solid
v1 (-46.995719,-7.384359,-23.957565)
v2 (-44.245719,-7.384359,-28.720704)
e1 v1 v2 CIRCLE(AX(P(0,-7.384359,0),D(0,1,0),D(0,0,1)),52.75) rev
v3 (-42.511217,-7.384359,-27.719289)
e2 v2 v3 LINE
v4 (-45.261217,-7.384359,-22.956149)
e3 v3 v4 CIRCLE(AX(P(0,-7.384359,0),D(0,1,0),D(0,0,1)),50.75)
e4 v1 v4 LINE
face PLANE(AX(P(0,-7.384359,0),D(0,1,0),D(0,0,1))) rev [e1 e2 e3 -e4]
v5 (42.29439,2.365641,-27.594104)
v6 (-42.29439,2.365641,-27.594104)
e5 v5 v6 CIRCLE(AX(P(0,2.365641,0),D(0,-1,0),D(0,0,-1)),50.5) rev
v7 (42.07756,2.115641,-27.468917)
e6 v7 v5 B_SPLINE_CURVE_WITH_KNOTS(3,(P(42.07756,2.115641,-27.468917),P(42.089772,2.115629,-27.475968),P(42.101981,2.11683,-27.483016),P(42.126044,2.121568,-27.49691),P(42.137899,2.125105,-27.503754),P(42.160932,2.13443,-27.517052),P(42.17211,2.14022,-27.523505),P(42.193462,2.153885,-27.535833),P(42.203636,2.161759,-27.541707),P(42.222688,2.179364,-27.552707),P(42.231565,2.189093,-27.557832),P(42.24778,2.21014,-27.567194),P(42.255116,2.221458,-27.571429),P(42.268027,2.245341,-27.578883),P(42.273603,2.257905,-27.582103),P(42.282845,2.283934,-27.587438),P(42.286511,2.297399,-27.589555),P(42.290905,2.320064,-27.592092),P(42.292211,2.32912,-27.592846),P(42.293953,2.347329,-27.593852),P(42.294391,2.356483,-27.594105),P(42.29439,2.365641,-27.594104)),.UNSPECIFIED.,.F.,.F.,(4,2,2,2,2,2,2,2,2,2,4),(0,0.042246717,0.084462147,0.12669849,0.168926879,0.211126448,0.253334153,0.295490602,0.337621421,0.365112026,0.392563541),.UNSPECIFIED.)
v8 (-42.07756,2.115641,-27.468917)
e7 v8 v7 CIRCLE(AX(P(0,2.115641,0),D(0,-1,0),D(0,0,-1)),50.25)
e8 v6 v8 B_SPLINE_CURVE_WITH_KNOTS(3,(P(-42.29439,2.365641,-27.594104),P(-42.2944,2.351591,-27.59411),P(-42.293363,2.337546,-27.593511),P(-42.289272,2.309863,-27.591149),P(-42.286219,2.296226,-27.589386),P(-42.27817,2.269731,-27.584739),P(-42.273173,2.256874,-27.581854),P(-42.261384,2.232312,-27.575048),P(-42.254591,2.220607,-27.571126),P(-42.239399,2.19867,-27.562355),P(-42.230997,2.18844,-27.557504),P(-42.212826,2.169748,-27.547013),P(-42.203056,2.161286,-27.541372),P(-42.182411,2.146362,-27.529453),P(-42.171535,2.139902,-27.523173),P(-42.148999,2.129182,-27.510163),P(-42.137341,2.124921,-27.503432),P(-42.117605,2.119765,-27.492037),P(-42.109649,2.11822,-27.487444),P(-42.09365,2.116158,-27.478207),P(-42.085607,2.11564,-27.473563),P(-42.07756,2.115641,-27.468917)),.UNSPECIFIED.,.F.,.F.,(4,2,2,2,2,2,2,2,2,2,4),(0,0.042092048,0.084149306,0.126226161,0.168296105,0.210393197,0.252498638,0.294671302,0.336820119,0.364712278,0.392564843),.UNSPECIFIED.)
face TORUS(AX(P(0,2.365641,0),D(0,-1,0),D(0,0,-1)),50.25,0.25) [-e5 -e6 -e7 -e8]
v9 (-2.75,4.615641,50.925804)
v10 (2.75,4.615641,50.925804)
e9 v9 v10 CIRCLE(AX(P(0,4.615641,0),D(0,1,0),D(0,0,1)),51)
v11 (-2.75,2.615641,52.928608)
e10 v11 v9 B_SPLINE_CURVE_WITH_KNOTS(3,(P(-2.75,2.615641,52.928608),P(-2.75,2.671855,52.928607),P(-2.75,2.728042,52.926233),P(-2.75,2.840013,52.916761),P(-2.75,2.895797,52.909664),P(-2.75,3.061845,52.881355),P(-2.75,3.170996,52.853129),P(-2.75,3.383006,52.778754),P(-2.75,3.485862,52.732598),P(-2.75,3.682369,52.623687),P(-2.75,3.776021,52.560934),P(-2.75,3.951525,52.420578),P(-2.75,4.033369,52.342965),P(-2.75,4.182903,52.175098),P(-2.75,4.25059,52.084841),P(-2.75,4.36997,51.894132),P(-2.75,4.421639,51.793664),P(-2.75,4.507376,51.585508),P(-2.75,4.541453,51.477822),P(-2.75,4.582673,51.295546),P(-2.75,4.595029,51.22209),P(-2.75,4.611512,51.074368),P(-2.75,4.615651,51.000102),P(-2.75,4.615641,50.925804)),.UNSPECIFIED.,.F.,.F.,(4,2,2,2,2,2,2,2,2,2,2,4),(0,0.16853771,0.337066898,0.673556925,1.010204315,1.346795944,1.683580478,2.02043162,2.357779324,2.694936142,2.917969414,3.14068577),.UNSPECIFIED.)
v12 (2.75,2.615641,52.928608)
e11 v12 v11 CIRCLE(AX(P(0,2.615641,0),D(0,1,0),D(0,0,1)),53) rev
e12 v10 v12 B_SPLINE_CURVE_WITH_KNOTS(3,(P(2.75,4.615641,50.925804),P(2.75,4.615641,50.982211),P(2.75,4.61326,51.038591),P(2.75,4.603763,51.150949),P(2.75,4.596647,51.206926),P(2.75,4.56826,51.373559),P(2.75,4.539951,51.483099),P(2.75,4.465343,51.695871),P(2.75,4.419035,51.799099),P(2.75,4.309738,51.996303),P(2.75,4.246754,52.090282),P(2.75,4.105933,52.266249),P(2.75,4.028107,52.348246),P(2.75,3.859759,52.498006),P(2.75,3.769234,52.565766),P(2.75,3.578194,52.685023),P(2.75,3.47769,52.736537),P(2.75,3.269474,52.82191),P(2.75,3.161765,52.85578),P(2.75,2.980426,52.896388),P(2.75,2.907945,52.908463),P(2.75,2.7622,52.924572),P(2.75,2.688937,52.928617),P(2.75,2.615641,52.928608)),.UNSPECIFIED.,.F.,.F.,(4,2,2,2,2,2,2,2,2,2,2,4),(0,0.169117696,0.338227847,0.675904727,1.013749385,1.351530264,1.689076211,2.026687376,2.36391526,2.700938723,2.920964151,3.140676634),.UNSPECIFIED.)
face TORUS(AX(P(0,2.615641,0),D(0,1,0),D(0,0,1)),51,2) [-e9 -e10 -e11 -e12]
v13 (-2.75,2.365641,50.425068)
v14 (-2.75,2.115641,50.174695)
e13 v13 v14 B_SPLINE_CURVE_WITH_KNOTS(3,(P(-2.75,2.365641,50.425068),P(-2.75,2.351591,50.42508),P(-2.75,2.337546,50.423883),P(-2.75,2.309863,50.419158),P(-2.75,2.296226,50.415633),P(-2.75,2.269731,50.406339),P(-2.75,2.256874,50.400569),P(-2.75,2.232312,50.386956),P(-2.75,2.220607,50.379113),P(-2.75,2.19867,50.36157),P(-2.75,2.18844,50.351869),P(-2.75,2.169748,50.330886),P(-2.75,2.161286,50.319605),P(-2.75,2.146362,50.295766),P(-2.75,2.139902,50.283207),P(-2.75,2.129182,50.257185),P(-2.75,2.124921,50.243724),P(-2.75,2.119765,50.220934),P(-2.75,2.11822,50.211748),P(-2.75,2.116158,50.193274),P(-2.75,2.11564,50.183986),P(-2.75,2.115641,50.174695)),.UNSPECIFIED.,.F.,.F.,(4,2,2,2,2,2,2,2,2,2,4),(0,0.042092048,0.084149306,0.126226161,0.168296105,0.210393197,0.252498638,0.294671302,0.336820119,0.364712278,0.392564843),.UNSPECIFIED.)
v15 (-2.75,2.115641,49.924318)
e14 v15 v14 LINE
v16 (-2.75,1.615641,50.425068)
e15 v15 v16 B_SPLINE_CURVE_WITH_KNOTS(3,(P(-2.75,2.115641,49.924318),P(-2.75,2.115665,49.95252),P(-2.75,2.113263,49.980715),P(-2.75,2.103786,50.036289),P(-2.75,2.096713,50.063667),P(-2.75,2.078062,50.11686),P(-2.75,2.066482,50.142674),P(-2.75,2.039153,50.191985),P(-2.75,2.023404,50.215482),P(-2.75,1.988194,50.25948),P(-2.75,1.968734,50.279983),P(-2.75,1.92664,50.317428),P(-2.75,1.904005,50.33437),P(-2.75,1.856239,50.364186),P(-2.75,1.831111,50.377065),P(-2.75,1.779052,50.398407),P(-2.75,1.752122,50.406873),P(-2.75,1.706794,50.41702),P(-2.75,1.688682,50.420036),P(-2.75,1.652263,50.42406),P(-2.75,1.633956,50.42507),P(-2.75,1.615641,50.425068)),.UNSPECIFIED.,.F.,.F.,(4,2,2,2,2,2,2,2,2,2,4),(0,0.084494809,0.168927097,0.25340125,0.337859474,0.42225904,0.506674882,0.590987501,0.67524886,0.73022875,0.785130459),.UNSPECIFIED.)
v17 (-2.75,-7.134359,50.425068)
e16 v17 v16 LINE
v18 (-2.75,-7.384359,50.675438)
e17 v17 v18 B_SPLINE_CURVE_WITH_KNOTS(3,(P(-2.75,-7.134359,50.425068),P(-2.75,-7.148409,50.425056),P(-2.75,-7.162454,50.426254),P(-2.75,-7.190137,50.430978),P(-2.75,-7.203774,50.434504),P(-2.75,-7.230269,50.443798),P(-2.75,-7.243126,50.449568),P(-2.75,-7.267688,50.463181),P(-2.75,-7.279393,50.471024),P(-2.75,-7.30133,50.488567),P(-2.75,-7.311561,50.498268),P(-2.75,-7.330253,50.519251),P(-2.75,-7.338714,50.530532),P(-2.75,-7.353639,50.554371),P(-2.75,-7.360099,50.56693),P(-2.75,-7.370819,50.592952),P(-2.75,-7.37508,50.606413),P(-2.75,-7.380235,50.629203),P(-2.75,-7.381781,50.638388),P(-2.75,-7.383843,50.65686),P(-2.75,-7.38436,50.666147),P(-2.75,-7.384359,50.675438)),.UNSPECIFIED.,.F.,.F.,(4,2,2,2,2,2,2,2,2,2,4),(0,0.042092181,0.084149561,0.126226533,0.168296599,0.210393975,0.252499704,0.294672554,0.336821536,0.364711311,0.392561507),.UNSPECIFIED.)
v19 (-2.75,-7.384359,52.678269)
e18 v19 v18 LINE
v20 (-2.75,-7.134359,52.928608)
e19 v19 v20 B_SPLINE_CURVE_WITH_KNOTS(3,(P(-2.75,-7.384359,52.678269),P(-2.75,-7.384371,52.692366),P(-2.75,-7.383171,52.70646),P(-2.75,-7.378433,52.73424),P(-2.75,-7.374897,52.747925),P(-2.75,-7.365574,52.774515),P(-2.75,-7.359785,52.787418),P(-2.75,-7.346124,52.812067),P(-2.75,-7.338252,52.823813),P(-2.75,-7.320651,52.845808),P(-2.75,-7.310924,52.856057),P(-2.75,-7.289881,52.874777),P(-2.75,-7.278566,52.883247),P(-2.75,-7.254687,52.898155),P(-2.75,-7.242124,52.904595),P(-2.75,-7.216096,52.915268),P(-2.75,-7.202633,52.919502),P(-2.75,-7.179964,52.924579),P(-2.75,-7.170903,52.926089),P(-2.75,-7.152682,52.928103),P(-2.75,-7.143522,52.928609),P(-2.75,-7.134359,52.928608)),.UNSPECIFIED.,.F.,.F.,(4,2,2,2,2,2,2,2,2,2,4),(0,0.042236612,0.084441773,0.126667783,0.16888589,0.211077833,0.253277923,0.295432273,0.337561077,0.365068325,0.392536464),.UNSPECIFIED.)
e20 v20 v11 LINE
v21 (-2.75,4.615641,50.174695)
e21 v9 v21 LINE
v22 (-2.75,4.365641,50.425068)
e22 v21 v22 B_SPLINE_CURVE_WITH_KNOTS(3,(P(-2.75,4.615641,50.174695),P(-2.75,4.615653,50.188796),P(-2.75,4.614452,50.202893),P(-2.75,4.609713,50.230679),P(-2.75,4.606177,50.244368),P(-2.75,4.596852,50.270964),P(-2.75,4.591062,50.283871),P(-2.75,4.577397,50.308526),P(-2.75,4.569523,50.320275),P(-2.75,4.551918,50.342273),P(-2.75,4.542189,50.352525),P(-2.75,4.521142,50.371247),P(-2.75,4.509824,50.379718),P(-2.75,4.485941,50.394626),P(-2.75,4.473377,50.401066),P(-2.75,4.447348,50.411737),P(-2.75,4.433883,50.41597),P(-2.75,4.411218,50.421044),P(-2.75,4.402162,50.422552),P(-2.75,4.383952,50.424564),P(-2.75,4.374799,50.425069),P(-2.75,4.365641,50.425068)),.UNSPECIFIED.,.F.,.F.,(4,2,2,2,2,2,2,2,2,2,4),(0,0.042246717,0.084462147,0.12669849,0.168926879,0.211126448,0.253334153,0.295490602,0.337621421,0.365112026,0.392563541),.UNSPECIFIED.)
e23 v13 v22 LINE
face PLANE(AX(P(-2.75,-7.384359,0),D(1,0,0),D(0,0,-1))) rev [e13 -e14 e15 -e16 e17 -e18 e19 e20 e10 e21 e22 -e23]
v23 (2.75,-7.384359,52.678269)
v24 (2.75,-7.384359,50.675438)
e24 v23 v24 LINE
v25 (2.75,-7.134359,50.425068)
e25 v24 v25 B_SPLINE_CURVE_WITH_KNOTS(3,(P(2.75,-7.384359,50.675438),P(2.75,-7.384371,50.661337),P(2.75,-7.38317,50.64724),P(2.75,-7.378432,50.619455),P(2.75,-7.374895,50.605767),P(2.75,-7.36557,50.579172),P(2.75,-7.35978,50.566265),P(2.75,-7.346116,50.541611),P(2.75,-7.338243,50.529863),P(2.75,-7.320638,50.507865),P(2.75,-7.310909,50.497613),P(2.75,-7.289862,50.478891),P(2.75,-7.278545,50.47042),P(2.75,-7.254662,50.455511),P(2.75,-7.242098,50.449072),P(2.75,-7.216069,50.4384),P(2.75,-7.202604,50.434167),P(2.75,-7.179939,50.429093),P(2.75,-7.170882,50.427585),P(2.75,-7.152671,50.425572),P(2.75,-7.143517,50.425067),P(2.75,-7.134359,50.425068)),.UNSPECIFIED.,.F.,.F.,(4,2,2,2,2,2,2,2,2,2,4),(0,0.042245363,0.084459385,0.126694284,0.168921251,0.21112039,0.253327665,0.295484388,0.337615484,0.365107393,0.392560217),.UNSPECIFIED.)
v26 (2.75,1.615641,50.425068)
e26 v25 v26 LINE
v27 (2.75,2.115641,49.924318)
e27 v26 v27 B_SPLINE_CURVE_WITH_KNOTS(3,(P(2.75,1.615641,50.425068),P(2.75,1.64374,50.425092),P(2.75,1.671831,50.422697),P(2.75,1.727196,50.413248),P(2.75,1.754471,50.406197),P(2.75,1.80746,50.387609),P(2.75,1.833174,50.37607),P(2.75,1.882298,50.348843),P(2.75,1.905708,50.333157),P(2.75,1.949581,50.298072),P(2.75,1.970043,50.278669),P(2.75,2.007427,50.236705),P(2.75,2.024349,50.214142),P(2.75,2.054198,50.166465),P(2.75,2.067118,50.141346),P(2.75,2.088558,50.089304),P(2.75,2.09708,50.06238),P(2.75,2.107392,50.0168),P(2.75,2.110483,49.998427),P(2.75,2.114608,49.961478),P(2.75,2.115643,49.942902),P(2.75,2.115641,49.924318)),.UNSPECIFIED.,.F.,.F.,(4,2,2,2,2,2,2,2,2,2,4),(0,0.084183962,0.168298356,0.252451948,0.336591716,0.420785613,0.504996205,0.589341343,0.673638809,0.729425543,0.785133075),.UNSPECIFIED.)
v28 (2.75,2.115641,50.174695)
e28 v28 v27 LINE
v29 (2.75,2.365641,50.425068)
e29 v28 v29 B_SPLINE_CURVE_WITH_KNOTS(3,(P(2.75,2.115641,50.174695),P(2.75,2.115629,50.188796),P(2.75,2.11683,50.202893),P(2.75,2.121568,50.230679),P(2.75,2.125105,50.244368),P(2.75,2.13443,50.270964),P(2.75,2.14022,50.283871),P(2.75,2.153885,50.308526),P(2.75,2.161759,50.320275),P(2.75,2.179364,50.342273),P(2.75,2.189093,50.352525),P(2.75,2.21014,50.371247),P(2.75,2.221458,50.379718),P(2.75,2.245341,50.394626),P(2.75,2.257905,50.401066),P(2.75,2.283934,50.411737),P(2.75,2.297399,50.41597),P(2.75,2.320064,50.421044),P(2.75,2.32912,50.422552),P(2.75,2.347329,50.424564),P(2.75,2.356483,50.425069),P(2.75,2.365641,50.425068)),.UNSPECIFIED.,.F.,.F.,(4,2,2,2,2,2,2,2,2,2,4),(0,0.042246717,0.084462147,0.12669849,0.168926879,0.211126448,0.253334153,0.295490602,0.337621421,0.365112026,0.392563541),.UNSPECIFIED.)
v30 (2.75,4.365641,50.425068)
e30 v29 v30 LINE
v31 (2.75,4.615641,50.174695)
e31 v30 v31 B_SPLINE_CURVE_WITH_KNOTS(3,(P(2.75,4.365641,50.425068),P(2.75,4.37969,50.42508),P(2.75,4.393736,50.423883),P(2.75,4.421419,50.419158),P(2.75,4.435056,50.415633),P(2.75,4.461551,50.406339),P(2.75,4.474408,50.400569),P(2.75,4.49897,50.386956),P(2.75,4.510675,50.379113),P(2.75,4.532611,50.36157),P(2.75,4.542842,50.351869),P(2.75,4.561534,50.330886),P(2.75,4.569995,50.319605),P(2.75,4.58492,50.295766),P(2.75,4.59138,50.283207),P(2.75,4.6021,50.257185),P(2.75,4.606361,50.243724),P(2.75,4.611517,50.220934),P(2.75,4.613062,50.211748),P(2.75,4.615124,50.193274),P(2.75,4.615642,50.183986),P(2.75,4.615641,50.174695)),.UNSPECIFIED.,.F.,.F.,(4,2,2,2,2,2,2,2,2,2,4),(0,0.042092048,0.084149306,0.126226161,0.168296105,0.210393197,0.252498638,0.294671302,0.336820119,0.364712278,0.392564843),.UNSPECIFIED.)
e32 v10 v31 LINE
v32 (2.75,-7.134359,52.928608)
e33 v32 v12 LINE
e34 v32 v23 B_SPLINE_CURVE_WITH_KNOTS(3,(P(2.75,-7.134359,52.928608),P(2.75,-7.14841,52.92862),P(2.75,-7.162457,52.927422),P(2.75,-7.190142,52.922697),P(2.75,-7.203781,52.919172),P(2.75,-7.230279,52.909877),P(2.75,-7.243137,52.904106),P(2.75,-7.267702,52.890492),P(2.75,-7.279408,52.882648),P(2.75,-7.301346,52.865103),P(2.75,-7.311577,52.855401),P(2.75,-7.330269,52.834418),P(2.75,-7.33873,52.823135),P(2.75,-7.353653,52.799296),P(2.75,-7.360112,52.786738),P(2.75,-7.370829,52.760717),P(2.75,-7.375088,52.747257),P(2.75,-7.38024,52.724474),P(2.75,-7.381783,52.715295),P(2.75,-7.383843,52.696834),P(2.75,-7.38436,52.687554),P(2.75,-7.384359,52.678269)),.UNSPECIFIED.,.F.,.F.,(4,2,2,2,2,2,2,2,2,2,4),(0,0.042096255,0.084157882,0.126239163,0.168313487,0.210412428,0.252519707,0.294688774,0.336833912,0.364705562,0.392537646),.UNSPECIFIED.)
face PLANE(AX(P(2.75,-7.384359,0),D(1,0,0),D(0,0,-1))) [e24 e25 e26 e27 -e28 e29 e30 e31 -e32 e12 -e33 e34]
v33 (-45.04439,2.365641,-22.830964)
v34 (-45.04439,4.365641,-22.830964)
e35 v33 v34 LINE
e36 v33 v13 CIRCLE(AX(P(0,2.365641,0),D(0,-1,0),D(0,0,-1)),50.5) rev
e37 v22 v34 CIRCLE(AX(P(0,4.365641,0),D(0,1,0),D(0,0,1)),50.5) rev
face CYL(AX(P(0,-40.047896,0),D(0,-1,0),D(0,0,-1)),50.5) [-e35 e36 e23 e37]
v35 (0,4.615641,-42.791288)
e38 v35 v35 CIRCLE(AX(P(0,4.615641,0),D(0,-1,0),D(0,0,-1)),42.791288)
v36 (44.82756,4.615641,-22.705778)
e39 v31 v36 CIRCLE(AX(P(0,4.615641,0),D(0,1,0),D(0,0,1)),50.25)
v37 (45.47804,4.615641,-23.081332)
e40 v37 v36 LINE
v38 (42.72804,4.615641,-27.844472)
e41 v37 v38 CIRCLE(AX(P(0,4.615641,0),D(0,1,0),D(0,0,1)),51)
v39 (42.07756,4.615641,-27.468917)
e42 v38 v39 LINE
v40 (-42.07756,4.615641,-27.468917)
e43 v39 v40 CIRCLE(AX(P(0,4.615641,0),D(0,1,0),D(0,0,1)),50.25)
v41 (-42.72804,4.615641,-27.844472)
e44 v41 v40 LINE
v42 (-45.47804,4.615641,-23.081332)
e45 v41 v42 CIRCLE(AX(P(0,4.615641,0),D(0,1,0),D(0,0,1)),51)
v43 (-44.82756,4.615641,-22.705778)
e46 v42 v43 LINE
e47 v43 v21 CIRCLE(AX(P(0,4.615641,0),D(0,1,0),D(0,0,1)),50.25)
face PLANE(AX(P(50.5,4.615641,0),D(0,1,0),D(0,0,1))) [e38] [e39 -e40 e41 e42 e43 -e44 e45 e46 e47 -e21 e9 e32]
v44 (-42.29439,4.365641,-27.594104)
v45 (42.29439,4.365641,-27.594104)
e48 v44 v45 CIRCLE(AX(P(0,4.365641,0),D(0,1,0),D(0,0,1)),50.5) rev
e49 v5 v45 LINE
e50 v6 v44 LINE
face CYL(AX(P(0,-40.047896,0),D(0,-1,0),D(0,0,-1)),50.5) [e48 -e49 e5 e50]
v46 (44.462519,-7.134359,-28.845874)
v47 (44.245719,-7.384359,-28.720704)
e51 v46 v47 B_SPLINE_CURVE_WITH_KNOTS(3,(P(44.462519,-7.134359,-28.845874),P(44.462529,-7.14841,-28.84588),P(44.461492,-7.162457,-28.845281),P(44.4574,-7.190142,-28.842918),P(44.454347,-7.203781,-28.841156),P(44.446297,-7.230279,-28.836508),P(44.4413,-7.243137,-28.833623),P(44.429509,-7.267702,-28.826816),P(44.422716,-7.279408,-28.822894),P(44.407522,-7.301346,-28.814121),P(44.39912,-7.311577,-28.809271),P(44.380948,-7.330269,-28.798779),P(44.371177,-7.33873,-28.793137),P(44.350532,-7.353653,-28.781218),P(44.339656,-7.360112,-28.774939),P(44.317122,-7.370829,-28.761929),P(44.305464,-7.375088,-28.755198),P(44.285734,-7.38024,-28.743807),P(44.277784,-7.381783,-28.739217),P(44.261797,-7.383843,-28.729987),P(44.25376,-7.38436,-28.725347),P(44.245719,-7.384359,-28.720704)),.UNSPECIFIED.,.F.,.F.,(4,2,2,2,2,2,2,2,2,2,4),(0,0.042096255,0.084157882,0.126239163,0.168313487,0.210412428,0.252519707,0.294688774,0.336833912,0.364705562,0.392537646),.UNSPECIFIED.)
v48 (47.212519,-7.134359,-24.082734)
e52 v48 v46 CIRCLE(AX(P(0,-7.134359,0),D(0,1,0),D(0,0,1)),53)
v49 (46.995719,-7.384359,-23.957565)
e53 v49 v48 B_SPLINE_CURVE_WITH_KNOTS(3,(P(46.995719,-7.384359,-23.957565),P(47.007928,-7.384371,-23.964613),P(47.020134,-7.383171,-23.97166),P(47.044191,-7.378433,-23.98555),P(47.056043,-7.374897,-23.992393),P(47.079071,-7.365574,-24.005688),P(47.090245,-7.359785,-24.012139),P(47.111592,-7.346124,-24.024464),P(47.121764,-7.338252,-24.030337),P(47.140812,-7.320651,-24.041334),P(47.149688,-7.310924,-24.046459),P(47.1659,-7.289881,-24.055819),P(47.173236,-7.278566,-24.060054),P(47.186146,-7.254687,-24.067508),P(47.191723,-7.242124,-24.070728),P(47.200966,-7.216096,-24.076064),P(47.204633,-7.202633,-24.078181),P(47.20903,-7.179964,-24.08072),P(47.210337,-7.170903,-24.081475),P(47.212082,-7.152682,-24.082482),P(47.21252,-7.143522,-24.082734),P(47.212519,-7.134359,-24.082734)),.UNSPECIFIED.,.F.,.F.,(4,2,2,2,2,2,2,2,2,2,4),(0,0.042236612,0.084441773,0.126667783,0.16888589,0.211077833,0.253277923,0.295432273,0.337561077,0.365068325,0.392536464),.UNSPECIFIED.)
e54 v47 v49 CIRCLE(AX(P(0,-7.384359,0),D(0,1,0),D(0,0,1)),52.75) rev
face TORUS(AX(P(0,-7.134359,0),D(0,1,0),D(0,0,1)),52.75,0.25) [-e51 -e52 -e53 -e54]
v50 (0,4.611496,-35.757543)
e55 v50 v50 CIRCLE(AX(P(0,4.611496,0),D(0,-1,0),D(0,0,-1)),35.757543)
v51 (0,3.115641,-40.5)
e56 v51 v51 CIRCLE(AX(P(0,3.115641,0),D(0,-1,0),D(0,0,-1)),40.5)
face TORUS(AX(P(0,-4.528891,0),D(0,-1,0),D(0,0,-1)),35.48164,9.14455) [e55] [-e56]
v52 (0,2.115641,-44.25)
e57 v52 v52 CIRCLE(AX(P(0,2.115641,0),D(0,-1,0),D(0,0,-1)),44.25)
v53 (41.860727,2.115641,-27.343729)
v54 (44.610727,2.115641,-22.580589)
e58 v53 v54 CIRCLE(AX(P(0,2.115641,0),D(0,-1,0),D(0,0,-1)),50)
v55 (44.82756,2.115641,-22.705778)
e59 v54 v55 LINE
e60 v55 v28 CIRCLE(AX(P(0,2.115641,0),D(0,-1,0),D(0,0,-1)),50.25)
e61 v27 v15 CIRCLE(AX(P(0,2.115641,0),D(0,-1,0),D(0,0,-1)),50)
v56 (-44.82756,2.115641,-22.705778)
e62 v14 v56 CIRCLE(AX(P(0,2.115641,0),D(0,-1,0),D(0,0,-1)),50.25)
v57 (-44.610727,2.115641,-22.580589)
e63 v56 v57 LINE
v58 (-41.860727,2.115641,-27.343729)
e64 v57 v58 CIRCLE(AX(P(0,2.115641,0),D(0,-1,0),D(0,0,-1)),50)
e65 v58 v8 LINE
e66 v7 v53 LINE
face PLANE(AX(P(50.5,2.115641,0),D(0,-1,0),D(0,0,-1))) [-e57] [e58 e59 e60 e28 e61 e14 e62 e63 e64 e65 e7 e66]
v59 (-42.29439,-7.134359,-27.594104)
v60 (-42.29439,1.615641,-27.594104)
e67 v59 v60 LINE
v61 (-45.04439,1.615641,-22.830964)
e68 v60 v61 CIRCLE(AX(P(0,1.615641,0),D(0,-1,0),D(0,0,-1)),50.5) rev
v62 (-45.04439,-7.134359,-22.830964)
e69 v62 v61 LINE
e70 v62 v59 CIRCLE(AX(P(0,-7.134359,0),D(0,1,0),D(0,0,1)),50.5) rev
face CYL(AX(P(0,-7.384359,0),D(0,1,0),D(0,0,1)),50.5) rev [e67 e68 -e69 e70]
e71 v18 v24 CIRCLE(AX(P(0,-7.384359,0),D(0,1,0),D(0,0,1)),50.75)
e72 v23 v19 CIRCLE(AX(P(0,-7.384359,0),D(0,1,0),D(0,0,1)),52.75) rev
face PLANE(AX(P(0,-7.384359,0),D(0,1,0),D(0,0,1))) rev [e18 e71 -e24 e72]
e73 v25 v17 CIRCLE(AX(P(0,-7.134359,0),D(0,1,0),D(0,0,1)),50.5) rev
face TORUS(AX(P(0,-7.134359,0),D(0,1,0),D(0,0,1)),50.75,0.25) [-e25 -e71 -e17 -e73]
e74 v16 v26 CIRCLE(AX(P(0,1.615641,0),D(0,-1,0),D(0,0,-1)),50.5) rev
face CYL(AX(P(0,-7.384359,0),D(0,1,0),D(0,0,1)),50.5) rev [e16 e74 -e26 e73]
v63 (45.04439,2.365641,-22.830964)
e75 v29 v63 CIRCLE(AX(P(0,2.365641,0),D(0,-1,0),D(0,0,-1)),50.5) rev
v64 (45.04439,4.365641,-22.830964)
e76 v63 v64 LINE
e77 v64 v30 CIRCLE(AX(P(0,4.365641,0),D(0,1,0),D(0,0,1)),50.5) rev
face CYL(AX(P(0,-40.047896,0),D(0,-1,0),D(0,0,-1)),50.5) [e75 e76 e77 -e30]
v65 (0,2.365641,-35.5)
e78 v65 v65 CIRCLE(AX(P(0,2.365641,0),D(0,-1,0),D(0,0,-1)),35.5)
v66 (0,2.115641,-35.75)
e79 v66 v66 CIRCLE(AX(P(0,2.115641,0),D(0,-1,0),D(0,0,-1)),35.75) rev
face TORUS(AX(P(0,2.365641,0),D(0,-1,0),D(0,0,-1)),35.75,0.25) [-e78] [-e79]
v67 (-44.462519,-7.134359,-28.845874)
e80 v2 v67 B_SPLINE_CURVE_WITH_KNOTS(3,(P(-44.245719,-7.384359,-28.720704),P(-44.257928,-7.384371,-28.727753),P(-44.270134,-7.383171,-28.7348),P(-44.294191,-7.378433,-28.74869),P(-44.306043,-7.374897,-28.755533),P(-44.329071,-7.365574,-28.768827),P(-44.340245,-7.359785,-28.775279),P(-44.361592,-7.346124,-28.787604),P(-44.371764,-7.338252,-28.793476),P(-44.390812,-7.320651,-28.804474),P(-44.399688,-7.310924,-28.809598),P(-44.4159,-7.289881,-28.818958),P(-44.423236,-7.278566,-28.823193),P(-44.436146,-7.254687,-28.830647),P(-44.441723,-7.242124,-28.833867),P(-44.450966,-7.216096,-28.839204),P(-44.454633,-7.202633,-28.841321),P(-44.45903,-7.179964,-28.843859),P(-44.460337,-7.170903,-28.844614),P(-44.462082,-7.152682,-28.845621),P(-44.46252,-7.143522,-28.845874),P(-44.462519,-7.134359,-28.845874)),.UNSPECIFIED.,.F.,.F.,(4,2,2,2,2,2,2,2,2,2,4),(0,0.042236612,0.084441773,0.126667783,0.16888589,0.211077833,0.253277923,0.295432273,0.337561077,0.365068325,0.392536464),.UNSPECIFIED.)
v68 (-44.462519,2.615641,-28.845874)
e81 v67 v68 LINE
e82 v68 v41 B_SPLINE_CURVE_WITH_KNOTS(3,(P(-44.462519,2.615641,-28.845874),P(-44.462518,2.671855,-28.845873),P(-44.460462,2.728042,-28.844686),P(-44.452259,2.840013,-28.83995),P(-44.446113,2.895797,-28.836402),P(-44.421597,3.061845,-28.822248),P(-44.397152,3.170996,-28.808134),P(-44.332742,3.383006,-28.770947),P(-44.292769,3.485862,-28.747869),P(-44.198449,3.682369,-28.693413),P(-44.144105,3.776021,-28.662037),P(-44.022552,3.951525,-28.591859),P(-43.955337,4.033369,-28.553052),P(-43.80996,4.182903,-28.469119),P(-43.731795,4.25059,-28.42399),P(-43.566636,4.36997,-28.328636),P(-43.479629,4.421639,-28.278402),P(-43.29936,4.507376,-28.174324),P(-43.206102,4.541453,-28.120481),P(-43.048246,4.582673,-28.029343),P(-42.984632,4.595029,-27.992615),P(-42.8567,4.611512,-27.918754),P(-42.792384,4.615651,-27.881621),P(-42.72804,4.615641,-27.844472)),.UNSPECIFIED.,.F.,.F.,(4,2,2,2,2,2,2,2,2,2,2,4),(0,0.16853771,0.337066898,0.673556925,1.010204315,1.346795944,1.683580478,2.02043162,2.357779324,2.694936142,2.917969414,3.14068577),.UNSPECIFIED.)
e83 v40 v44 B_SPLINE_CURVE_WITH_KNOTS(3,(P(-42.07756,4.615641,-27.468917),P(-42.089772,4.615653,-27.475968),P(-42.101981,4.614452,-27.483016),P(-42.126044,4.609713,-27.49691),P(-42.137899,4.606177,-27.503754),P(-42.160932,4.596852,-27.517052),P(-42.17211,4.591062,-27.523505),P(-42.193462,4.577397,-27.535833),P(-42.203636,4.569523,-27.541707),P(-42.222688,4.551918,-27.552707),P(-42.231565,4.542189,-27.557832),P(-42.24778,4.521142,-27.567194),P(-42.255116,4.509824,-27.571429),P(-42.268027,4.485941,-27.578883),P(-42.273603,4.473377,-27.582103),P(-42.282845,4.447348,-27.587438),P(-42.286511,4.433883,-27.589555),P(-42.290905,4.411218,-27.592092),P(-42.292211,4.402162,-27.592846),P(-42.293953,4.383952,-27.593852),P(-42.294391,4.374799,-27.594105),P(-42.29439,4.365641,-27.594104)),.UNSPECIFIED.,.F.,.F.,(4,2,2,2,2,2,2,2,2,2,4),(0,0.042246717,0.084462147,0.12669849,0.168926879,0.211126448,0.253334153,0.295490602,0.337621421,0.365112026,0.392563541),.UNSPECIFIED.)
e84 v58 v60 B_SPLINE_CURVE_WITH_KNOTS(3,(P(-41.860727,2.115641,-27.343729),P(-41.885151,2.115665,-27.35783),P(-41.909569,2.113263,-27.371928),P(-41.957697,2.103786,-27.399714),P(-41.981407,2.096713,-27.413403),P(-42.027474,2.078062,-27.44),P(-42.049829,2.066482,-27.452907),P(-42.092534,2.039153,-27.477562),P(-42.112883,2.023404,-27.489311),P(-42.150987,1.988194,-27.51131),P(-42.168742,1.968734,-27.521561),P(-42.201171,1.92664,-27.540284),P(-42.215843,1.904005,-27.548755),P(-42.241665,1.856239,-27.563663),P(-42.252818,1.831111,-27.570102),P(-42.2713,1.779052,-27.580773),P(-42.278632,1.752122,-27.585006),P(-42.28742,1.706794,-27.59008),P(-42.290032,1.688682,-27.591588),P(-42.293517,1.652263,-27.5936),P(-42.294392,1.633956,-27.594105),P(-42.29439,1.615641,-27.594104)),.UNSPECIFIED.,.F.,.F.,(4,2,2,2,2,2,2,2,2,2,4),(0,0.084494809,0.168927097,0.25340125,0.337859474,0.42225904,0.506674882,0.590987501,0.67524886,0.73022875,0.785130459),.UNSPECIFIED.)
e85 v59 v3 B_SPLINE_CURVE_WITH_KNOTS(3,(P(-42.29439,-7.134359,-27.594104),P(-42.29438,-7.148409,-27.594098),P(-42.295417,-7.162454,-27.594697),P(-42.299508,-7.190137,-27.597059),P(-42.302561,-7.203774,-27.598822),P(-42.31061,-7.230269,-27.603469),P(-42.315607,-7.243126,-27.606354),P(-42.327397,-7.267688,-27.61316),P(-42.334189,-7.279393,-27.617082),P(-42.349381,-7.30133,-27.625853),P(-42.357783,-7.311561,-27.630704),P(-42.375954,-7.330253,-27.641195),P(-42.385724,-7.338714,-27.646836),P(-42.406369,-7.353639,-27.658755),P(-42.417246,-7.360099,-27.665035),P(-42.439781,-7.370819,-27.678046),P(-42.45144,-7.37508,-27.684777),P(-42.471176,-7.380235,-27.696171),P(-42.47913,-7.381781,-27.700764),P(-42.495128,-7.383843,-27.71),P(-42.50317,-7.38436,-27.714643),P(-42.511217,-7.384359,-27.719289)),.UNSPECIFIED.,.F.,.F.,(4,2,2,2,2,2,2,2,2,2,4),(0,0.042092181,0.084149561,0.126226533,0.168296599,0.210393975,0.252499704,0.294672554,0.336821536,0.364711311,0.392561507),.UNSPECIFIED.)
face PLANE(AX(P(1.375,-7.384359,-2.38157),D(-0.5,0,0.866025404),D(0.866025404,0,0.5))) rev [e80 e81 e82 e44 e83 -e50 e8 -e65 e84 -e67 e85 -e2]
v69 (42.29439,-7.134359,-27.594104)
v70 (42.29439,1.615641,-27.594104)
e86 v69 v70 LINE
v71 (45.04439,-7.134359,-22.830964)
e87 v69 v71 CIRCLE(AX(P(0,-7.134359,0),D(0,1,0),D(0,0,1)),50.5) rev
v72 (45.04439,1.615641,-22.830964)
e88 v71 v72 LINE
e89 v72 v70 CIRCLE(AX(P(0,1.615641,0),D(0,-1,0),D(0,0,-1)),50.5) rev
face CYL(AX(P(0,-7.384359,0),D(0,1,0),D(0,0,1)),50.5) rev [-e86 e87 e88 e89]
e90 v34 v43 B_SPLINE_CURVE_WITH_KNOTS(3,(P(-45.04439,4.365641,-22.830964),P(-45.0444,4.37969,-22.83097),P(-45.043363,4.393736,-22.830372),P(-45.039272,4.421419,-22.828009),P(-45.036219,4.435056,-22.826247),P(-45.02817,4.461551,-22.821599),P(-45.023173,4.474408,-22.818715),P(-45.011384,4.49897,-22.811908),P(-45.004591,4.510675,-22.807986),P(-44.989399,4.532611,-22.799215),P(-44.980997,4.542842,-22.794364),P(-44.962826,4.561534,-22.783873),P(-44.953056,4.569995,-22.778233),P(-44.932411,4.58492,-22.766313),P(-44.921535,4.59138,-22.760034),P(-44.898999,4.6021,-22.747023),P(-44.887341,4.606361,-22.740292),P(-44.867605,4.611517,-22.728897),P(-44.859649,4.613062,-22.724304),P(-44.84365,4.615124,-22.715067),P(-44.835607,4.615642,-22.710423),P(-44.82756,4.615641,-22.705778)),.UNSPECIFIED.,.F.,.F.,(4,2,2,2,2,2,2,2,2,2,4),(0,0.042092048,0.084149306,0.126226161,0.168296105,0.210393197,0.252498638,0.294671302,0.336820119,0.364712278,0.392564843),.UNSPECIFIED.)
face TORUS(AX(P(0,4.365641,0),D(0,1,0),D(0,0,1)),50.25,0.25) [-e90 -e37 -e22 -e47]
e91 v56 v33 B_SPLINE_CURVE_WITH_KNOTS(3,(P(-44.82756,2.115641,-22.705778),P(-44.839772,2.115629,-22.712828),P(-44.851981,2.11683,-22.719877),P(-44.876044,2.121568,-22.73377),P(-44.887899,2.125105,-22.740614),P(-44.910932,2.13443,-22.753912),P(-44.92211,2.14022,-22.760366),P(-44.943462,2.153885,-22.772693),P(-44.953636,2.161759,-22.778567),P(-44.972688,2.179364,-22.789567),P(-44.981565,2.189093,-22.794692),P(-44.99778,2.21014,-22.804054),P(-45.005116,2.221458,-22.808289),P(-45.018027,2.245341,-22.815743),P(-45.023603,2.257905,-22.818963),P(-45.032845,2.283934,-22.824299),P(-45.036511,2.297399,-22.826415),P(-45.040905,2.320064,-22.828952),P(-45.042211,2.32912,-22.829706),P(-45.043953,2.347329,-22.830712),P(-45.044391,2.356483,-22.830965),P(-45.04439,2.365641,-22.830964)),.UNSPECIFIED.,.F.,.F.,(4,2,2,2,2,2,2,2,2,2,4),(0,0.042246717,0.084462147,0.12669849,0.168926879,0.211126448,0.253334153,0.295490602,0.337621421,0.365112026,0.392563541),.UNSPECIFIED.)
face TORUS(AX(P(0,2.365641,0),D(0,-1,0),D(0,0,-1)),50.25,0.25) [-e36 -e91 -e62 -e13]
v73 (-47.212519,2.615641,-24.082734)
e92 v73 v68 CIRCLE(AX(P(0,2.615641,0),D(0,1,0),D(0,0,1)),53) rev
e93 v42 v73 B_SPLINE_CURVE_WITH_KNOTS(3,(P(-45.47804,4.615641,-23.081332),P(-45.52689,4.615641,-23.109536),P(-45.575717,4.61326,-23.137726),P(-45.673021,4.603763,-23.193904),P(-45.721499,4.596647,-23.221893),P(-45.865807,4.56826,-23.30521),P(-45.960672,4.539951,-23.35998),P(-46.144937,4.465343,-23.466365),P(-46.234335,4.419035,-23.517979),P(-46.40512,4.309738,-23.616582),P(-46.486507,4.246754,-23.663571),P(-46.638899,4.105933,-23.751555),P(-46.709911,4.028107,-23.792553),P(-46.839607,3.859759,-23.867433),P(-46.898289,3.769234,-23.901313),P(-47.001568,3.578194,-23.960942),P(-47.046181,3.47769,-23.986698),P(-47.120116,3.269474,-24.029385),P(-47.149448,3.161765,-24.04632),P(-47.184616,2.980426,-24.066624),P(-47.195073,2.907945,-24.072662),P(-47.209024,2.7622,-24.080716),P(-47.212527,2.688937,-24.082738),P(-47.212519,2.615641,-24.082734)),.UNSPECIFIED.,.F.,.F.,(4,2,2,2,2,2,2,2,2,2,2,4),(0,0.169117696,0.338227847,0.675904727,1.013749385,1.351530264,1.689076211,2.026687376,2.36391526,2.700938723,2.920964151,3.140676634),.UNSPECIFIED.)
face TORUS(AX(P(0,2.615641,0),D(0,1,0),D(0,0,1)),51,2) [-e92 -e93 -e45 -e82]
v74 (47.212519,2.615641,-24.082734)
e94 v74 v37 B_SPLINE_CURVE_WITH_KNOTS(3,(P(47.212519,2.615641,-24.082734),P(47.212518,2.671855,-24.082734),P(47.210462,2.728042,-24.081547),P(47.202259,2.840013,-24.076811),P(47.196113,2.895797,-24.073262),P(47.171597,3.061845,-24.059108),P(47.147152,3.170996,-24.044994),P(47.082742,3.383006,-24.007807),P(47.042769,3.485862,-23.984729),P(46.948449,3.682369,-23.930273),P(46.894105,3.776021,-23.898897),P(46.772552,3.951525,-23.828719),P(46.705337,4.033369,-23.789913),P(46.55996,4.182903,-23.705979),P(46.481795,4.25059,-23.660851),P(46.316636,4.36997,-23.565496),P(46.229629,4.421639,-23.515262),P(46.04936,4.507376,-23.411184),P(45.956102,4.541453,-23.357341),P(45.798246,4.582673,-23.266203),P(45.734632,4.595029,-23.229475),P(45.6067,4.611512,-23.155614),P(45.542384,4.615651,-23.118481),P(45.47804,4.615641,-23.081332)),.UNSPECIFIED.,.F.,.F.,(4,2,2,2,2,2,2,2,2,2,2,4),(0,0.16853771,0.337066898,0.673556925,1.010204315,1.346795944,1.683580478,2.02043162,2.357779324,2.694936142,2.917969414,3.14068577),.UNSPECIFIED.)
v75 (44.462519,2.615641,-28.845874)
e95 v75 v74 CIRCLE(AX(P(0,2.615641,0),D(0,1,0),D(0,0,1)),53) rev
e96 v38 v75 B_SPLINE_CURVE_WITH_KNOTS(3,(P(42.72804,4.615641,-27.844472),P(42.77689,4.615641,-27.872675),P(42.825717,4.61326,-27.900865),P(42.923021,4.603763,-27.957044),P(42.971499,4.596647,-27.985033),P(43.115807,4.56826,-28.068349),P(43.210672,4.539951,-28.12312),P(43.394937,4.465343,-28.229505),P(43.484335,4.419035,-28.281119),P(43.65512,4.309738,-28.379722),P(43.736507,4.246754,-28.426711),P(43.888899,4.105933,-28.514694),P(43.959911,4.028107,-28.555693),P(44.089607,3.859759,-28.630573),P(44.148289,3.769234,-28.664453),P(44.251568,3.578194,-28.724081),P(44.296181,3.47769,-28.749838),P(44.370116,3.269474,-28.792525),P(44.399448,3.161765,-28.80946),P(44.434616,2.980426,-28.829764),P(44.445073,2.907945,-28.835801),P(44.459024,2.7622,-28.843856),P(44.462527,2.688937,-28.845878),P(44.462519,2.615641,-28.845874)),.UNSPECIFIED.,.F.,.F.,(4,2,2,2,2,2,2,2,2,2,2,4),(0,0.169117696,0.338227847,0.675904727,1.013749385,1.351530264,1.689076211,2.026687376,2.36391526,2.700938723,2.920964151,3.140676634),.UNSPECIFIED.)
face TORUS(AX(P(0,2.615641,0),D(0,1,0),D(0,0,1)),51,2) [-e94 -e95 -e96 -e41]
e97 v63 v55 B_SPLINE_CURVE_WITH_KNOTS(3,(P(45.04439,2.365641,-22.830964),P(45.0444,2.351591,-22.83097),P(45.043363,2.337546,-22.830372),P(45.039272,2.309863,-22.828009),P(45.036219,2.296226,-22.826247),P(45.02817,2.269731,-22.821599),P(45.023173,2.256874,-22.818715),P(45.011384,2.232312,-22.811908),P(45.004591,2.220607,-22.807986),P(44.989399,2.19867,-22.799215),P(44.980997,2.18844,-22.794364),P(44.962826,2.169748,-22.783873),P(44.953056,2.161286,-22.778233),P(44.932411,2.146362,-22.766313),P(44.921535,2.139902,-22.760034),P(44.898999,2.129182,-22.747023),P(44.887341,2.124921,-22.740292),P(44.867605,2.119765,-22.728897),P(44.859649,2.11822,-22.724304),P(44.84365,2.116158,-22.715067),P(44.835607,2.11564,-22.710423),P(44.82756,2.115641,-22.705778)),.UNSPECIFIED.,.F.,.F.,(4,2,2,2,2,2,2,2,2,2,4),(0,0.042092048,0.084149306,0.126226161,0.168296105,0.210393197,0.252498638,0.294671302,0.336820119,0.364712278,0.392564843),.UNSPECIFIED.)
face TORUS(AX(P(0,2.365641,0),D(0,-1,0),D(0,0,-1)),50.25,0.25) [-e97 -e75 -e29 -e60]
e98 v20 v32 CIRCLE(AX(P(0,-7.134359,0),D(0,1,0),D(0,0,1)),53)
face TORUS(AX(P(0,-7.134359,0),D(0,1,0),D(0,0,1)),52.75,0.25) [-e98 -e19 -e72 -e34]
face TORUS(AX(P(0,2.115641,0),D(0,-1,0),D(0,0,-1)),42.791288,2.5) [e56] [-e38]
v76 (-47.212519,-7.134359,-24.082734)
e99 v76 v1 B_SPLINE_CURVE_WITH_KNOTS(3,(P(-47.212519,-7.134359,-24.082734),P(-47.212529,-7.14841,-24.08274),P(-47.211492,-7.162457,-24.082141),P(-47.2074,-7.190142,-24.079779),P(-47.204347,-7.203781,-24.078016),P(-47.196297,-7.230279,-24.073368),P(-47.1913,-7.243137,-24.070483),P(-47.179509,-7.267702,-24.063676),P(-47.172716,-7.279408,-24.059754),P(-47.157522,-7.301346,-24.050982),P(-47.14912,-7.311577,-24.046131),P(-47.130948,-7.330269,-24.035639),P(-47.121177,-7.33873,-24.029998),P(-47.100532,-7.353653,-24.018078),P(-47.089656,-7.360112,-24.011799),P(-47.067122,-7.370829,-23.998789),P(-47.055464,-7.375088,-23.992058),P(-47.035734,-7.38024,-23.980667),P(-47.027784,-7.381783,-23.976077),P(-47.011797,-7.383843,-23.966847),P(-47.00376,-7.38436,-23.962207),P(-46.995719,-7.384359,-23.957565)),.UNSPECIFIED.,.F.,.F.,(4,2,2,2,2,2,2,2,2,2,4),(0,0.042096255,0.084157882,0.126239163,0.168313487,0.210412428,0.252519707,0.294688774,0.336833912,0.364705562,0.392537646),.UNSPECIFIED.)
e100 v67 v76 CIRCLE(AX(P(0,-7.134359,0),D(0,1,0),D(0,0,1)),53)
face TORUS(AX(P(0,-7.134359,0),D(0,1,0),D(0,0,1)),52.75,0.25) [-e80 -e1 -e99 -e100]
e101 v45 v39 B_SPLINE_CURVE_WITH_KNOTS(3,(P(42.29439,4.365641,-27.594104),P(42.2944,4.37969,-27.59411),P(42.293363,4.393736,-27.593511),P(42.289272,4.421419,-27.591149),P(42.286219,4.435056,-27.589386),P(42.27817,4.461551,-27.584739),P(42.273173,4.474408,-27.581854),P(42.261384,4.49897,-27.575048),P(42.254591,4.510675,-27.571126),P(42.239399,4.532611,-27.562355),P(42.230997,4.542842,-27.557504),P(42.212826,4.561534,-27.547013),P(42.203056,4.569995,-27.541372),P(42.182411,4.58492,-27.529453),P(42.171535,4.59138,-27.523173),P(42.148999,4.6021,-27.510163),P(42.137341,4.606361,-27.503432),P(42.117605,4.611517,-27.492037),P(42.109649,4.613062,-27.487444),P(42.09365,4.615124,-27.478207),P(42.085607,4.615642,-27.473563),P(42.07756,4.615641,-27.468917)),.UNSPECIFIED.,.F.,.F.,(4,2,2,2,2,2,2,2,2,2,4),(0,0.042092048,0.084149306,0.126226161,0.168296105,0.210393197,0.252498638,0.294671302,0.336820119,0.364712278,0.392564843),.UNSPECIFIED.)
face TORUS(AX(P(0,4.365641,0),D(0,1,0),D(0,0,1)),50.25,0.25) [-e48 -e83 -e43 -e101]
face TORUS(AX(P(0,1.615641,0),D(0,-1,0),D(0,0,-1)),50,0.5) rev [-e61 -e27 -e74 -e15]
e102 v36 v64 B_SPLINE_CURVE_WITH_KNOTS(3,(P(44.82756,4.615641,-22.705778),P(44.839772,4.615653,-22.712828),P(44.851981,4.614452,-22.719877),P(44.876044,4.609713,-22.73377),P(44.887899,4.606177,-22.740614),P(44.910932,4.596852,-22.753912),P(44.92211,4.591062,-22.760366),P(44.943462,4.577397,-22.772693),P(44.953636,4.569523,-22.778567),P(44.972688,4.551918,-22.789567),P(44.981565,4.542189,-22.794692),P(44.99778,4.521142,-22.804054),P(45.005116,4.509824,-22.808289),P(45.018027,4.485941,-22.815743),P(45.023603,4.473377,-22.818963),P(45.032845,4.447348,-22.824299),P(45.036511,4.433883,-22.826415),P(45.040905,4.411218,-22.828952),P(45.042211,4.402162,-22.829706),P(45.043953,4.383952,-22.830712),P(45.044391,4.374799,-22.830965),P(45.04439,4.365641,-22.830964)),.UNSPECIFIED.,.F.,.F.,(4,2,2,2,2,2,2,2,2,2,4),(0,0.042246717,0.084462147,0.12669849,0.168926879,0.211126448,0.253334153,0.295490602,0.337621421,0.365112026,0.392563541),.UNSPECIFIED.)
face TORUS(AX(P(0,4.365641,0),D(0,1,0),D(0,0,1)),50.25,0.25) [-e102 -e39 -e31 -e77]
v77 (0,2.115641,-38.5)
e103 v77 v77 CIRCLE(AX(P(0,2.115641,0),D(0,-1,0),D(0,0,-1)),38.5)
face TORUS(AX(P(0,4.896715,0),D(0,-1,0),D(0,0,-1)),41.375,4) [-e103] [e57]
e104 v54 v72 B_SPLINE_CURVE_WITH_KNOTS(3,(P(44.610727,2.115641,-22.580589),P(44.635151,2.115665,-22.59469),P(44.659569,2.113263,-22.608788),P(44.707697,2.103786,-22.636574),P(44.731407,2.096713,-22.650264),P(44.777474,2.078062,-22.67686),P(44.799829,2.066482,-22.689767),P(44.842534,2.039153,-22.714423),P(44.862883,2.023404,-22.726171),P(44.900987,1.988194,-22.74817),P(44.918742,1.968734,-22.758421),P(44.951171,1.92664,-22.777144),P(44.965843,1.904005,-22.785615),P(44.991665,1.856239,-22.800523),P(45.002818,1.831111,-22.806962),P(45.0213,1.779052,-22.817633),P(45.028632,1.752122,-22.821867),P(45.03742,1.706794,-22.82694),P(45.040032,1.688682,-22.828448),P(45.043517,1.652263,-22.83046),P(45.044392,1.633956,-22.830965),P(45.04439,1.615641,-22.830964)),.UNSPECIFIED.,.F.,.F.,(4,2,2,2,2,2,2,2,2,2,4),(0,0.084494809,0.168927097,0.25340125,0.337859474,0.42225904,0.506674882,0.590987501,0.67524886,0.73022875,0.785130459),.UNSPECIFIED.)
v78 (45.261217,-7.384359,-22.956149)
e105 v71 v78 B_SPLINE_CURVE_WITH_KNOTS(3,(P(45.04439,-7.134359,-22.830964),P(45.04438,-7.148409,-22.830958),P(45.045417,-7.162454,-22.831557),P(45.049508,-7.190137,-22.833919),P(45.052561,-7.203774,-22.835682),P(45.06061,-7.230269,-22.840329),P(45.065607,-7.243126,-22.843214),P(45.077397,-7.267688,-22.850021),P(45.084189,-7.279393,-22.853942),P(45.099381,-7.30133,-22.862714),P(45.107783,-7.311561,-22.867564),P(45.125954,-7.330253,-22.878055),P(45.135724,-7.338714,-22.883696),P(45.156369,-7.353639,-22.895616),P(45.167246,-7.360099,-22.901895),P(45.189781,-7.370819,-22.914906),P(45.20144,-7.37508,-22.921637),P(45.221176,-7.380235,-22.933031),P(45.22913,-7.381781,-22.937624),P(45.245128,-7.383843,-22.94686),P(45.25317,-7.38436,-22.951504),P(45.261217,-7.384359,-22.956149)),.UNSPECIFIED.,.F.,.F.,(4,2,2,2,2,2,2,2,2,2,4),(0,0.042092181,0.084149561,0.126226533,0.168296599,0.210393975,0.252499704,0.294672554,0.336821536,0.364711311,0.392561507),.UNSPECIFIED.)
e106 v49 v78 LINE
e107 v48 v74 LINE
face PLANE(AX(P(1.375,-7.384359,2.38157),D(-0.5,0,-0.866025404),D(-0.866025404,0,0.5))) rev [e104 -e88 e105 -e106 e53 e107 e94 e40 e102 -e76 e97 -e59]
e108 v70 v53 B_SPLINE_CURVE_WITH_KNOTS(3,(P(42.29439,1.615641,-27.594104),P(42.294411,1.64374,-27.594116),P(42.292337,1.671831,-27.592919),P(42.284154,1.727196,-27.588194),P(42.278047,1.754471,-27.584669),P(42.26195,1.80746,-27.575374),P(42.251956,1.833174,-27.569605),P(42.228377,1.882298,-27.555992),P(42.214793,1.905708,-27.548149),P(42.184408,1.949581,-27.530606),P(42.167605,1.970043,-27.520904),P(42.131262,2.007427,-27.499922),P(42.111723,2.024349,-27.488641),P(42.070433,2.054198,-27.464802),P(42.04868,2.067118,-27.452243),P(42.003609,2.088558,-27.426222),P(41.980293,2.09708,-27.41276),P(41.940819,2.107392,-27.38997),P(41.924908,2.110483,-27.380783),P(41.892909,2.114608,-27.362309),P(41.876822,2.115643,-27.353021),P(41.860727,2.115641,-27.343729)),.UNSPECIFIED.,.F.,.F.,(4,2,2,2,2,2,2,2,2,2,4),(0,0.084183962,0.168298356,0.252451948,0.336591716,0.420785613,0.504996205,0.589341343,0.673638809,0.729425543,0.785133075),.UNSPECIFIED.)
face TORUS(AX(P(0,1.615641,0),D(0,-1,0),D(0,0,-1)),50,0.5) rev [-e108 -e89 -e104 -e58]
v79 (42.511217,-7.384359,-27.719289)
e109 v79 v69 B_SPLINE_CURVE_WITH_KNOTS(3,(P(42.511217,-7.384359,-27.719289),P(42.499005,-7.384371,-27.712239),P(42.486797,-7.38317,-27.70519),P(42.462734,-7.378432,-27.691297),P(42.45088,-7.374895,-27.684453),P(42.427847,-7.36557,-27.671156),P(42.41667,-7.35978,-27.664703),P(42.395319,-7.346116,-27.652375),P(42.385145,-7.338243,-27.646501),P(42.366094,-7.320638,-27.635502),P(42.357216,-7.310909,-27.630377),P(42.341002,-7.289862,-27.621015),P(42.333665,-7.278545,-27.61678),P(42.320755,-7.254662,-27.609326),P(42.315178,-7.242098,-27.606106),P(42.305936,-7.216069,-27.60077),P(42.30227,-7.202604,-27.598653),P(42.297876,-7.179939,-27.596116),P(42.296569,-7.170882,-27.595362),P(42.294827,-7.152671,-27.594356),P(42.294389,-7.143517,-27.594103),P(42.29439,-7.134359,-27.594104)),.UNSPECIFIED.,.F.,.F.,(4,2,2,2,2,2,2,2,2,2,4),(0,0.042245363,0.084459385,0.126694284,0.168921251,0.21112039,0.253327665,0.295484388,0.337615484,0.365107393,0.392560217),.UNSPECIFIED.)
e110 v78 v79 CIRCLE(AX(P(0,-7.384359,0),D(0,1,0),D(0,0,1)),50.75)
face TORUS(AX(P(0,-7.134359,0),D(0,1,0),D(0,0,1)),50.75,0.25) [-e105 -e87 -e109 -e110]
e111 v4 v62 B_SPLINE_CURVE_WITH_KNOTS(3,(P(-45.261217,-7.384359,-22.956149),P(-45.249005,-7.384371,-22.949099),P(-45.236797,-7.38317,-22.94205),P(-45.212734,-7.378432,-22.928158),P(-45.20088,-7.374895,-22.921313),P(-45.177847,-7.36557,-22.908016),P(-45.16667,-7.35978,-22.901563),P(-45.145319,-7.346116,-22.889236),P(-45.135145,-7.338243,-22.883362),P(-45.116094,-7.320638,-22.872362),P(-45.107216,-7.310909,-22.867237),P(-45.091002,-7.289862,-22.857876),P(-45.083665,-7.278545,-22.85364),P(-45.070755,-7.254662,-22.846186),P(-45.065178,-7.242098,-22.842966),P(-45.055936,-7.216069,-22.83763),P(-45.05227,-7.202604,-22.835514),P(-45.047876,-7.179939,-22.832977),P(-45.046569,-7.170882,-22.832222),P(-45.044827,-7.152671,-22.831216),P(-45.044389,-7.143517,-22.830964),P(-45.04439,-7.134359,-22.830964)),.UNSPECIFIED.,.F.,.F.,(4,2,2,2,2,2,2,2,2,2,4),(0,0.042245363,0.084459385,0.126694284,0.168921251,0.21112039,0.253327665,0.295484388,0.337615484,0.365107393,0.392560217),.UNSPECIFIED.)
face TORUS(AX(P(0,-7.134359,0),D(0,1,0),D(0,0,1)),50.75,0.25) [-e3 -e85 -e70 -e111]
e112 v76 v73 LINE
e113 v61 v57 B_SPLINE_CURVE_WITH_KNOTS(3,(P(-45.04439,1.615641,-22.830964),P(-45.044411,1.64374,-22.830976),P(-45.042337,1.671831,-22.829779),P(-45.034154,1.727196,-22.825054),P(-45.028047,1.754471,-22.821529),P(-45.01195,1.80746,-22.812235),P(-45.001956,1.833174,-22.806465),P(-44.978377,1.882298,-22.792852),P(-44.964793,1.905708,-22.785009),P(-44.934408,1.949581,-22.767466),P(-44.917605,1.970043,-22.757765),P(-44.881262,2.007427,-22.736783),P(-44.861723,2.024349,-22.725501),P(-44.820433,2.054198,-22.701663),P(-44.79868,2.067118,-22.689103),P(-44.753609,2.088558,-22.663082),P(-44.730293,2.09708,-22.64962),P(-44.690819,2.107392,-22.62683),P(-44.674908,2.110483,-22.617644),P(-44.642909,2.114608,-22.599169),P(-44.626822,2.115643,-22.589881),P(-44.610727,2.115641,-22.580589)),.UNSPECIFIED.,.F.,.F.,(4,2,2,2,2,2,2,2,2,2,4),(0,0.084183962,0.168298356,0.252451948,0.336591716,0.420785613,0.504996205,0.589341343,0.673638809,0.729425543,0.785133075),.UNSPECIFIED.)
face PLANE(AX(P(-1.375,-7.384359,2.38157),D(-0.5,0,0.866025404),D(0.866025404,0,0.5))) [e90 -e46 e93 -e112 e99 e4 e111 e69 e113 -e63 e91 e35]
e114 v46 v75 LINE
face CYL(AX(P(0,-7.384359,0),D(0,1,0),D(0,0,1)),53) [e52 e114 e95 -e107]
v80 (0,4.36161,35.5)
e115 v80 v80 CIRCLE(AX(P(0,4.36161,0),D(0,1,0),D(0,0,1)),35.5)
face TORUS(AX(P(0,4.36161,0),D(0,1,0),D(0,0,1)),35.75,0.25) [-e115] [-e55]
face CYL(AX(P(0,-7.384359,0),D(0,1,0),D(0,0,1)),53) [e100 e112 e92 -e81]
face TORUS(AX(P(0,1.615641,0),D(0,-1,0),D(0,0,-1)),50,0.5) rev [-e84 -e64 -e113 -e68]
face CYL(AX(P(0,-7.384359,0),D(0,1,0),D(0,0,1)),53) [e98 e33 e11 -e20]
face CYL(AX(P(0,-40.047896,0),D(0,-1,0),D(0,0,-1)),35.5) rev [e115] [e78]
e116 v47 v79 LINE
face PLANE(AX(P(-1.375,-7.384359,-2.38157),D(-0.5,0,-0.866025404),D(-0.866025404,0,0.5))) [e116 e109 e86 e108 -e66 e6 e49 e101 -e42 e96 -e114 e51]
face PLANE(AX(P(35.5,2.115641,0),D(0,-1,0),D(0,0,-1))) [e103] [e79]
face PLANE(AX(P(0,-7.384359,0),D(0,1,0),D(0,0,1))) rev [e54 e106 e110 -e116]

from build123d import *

# Parameters (mm, degrees)
RESSALTO_EXTRUS_O1_DEPTH = 12
FILETE1_R                = 2
FILETE2_R                = 0.25
FILETE3_R                = 0.5
FILETE4_R                = 0.25


with BuildPart() as part:
    # Esboço1 → Revolução2 (revolve)
    with BuildSketch(Plane.XY, mode=Mode.PRIVATE) as revolu_o2_sk:
        with BuildLine():
            Line((50.5, 2.1156409253243282), (50.5, 4.615640925324328))
            Line((50.5, 4.615640925324328), (42.79128784747792, 4.615640925324325))
            ThreePointArc((42.79128784747792, 4.615640925324325), (41.421981453715006, 4.207290991659514), (40.5, 3.1156409253243265))
            ThreePointArc((40.5, 3.1156409253243265), (38.109307633859444, 4.229999704855797), (35.5, 4.6156409253243265))
            Line((35.5, 4.6156409253243265), (35.5, 2.115640925324327))
            Line((35.5, 2.115640925324327), (38.5, 2.115640925324326))
            ThreePointArc((38.5, 2.115640925324326), (41.375, 0.8967153579852054), (44.25, 2.115640925324326))
            Line((44.25, 2.115640925324326), (50.5, 2.1156409253243282))
        make_face()
    revolve(revolu_o2_sk.sketch.rotate(Axis((0, -40.04789590254706, 0), (0, 1, 0)), 90), axis=Axis((0, -40.04789590254706, 0), (0, 1, 0)))

    # Esboço2 → Ressalto-extrusão1 (add)
    with BuildSketch(Plane(origin=(0, 4.6156409253243265, 0), x_dir=(1, 0, 0), z_dir=(0, 1, 0))):
        with BuildLine():
            Line((-47.21251874829168, 24.082733927903796), (-45.04439002321137, 22.83096422484113))
            ThreePointArc((-45.04439002321138, 22.830964224841132), (-43.734282891106815, 25.24999999999606), (-42.29439002321152, 27.594103945655235))
            Line((-42.29439002321151, 27.594103945655238), (-44.46251874829165, 28.845873648718204))
            ThreePointArc((-44.46251874829164, 28.8458736487182), (-45.899346400575126, 26.50000000000022), (-47.21251874829167, 24.082733927903792))
        make_face()
        with BuildLine():
            ThreePointArc((42.29439002321179, 27.594103945654822), (43.73428289110706, 25.249999999995644), (45.04439002321159, 22.830964224840706))
            Line((45.04439002321159, 22.83096422484071), (47.212518748292, 24.08273392790313))
            ThreePointArc((47.212518748292, 24.082733927903135), (45.899346400575496, 26.49999999999958), (44.46251874829204, 28.84587364871758))
            Line((44.46251874829204, 28.845873648717575), (42.29439002321178, 27.59410394565482))
        make_face()
        with BuildLine():
            Line((-2.750000000000071, -50.4250681704959), (-2.7500000000000027, -52.92860757662155))
            ThreePointArc((-2.7500000000000027, -52.92860757662155), (0, -53), (2.7500000000000036, -52.928607576621545))
            Line((2.7500000000000027, -52.92860757662155), (2.7499999999995683, -50.425068170495926))
            ThreePointArc((2.7499999999995683, -50.42506817049593), (-2.5191e-13, -50.499999999991665), (-2.7500000000000715, -50.425068170495905))
        make_face()
    extrude(amount=-RESSALTO_EXTRUS_O1_DEPTH)

    # Filete1
    filete1_edges = [part.edges().sort_by_distance(p)[0] for p in [
        (-45.899346400575126, 4.6156409253243265, -26.50000000000022),
        (45.899346400575496, 4.6156409253243265, -26.49999999999958),
        (2e-15, 4.6156409253243265, 53),
    ]]
    fillet(filete1_edges, radius=FILETE1_R)

    # Filete2
    filete2_edges = [part.edges().sort_by_distance(p)[0] for p in [
        (-45.899346400575126, -7.3843590746756735, -26.50000000000022),
        (-43.734282891106815, -7.3843590746756735, -25.249999999996064),
        (45.899346400575496, -7.3843590746756735, -26.49999999999958),
        (43.73428289110706, -7.3843590746756735, -25.249999999995637),
        (2e-15, -7.3843590746756735, 53),
        (-2.5147e-13, -7.3843590746756735, 50.49999999999167),
    ]]
    fillet(filete2_edges, radius=FILETE2_R)

    # Filete3
    # the kernel refuses this fillet: 0.5 mm, written as the material it adds along each edge
    with BuildSketch(Plane(origin=(0, 2.1156409253243282, 0), x_dir=(0.9028843153664264, 0, -0.4298836040898738), z_dir=(0.4298836040898738, 0, 0.9028843153664264))) as filete3_piece_1_section:
        with BuildLine():
            CenterArc((50.499999999991694 - FILETE3_R, -FILETE3_R), FILETE3_R, 0, 90)
            Line((50.4999999999917, -FILETE3_R), (50.499999999991694, 0))
            Line((50.499999999991694, 0), (50.499999999991694 - FILETE3_R, 0))
        make_face()
    filete3_piece_1 = revolve(axis=Axis((0, 2.1156409253243282, 0), (0, 1, 0)), revolution_arc=9.079652812762179, mode=Mode.PRIVATE)
    filete3_piece_1 = split(filete3_piece_1, bisect_by=Plane(origin=(42.24088038823217, 2.0039570628820855, -27.563210143495105), z_dir=(0.49999999999997263, 0, 0.8660254037844545)), keep=Keep.TOP, mode=Mode.PRIVATE)
    filete3_piece_1 = split(filete3_piece_1, bisect_by=Plane(origin=(44.990880388231496, 2.0039570628820855, -22.800070422680726), z_dir=(-0.49999999999984684, 0, -0.8660254037845273)), keep=Keep.TOP, mode=Mode.PRIVATE)
    add(filete3_piece_1)
    with BuildSketch(Plane(origin=(0, 2.1156409253243282, 0), x_dir=(-0.07915203587100311, 0, 0.9968625558307803), z_dir=(-0.9968625558307803, 0, -0.07915203587100311))) as filete3_piece_2_section:
        with BuildLine():
            CenterArc((50.50000000000008 - FILETE3_R, -FILETE3_R), FILETE3_R, 0, 90)
            Line((50.50000000000008, -FILETE3_R), (50.50000000000008, 0))
            Line((50.50000000000008, 0), (50.50000000000008 - FILETE3_R, 0))
        make_face()
    filete3_piece_2 = revolve(axis=Axis((0, 2.1156409253243282, 0), (0, 1, 0)), revolution_arc=9.079652812764522, mode=Mode.PRIVATE)
    filete3_piece_2 = split(filete3_piece_2, bisect_by=Plane(origin=(-2.750000000000073, 2.0039570615884563, 50.36328056605681), z_dir=(1, 0, -2.732e-14)), keep=Keep.TOP, mode=Mode.PRIVATE)
    filete3_piece_2 = split(filete3_piece_2, bisect_by=Plane(origin=(2.7499999999995577, 2.0039570615884563, 50.363280566056254), z_dir=(-1, 0, 1.7348e-13)), keep=Keep.TOP, mode=Mode.PRIVATE)
    add(filete3_piece_2)
    with BuildSketch(Plane(origin=(0, 2.1156409253243282, 0), x_dir=(-0.8237322794954426, 0, -0.5669789517409284), z_dir=(0.5669789517409284, 0, -0.8237322794954426))) as filete3_piece_3_section:
        with BuildLine():
            CenterArc((50.49999999999168 - FILETE3_R, -FILETE3_R), FILETE3_R, 0, 90)
            Line((50.49999999999168 - FILETE3_R, 0), (50.49999999999168, 0))
            Line((50.49999999999168, 0), (50.49999999999168, -FILETE3_R))
        make_face()
    filete3_piece_3 = revolve(axis=Axis((0, 2.1156409253243282, 0), (0, 1, 0)), revolution_arc=9.079652812762262, mode=Mode.PRIVATE)
    filete3_piece_3 = split(filete3_piece_3, bisect_by=Plane(origin=(-44.99088038823965, 2.0039570626357412, -22.800070422685973), z_dir=(0.49999999999993744, 0, -0.8660254037844748)), keep=Keep.TOP, mode=Mode.PRIVATE)
    filete3_piece_3 = split(filete3_piece_3, bisect_by=Plane(origin=(-42.240880388239844, 2.0039570626357412, -27.5632101435001), z_dir=(-0.5000000000000564, 0, 0.8660254037844062)), keep=Keep.TOP, mode=Mode.PRIVATE)
    add(filete3_piece_3)

    # Filete4
    filete4_edges = [part.edges().sort_by_distance(p)[0] for p in [
        (2.4869e-13, 4.615640925324328, -50.5),
        (2.3803e-13, 2.1156409253243282, -50.50000000000001),
        (43.73428289111403, 4.615640925324328, 25.250000000000217),
        (43.73428289111443, 2.1156409253243282, 25.249999999999517),
        (-43.734282891114276, 4.615640925324328, 25.249999999999773),
        (-43.73428289111466, 2.1156409253243282, 25.249999999999112),
        (-8.29e-15, 2.1156409253243282, 35.5),
        (-8.29e-15, 4.615640925324328, 35.5),
    ]]
    fillet(filete4_edges, radius=FILETE4_R)


solid = part.part
